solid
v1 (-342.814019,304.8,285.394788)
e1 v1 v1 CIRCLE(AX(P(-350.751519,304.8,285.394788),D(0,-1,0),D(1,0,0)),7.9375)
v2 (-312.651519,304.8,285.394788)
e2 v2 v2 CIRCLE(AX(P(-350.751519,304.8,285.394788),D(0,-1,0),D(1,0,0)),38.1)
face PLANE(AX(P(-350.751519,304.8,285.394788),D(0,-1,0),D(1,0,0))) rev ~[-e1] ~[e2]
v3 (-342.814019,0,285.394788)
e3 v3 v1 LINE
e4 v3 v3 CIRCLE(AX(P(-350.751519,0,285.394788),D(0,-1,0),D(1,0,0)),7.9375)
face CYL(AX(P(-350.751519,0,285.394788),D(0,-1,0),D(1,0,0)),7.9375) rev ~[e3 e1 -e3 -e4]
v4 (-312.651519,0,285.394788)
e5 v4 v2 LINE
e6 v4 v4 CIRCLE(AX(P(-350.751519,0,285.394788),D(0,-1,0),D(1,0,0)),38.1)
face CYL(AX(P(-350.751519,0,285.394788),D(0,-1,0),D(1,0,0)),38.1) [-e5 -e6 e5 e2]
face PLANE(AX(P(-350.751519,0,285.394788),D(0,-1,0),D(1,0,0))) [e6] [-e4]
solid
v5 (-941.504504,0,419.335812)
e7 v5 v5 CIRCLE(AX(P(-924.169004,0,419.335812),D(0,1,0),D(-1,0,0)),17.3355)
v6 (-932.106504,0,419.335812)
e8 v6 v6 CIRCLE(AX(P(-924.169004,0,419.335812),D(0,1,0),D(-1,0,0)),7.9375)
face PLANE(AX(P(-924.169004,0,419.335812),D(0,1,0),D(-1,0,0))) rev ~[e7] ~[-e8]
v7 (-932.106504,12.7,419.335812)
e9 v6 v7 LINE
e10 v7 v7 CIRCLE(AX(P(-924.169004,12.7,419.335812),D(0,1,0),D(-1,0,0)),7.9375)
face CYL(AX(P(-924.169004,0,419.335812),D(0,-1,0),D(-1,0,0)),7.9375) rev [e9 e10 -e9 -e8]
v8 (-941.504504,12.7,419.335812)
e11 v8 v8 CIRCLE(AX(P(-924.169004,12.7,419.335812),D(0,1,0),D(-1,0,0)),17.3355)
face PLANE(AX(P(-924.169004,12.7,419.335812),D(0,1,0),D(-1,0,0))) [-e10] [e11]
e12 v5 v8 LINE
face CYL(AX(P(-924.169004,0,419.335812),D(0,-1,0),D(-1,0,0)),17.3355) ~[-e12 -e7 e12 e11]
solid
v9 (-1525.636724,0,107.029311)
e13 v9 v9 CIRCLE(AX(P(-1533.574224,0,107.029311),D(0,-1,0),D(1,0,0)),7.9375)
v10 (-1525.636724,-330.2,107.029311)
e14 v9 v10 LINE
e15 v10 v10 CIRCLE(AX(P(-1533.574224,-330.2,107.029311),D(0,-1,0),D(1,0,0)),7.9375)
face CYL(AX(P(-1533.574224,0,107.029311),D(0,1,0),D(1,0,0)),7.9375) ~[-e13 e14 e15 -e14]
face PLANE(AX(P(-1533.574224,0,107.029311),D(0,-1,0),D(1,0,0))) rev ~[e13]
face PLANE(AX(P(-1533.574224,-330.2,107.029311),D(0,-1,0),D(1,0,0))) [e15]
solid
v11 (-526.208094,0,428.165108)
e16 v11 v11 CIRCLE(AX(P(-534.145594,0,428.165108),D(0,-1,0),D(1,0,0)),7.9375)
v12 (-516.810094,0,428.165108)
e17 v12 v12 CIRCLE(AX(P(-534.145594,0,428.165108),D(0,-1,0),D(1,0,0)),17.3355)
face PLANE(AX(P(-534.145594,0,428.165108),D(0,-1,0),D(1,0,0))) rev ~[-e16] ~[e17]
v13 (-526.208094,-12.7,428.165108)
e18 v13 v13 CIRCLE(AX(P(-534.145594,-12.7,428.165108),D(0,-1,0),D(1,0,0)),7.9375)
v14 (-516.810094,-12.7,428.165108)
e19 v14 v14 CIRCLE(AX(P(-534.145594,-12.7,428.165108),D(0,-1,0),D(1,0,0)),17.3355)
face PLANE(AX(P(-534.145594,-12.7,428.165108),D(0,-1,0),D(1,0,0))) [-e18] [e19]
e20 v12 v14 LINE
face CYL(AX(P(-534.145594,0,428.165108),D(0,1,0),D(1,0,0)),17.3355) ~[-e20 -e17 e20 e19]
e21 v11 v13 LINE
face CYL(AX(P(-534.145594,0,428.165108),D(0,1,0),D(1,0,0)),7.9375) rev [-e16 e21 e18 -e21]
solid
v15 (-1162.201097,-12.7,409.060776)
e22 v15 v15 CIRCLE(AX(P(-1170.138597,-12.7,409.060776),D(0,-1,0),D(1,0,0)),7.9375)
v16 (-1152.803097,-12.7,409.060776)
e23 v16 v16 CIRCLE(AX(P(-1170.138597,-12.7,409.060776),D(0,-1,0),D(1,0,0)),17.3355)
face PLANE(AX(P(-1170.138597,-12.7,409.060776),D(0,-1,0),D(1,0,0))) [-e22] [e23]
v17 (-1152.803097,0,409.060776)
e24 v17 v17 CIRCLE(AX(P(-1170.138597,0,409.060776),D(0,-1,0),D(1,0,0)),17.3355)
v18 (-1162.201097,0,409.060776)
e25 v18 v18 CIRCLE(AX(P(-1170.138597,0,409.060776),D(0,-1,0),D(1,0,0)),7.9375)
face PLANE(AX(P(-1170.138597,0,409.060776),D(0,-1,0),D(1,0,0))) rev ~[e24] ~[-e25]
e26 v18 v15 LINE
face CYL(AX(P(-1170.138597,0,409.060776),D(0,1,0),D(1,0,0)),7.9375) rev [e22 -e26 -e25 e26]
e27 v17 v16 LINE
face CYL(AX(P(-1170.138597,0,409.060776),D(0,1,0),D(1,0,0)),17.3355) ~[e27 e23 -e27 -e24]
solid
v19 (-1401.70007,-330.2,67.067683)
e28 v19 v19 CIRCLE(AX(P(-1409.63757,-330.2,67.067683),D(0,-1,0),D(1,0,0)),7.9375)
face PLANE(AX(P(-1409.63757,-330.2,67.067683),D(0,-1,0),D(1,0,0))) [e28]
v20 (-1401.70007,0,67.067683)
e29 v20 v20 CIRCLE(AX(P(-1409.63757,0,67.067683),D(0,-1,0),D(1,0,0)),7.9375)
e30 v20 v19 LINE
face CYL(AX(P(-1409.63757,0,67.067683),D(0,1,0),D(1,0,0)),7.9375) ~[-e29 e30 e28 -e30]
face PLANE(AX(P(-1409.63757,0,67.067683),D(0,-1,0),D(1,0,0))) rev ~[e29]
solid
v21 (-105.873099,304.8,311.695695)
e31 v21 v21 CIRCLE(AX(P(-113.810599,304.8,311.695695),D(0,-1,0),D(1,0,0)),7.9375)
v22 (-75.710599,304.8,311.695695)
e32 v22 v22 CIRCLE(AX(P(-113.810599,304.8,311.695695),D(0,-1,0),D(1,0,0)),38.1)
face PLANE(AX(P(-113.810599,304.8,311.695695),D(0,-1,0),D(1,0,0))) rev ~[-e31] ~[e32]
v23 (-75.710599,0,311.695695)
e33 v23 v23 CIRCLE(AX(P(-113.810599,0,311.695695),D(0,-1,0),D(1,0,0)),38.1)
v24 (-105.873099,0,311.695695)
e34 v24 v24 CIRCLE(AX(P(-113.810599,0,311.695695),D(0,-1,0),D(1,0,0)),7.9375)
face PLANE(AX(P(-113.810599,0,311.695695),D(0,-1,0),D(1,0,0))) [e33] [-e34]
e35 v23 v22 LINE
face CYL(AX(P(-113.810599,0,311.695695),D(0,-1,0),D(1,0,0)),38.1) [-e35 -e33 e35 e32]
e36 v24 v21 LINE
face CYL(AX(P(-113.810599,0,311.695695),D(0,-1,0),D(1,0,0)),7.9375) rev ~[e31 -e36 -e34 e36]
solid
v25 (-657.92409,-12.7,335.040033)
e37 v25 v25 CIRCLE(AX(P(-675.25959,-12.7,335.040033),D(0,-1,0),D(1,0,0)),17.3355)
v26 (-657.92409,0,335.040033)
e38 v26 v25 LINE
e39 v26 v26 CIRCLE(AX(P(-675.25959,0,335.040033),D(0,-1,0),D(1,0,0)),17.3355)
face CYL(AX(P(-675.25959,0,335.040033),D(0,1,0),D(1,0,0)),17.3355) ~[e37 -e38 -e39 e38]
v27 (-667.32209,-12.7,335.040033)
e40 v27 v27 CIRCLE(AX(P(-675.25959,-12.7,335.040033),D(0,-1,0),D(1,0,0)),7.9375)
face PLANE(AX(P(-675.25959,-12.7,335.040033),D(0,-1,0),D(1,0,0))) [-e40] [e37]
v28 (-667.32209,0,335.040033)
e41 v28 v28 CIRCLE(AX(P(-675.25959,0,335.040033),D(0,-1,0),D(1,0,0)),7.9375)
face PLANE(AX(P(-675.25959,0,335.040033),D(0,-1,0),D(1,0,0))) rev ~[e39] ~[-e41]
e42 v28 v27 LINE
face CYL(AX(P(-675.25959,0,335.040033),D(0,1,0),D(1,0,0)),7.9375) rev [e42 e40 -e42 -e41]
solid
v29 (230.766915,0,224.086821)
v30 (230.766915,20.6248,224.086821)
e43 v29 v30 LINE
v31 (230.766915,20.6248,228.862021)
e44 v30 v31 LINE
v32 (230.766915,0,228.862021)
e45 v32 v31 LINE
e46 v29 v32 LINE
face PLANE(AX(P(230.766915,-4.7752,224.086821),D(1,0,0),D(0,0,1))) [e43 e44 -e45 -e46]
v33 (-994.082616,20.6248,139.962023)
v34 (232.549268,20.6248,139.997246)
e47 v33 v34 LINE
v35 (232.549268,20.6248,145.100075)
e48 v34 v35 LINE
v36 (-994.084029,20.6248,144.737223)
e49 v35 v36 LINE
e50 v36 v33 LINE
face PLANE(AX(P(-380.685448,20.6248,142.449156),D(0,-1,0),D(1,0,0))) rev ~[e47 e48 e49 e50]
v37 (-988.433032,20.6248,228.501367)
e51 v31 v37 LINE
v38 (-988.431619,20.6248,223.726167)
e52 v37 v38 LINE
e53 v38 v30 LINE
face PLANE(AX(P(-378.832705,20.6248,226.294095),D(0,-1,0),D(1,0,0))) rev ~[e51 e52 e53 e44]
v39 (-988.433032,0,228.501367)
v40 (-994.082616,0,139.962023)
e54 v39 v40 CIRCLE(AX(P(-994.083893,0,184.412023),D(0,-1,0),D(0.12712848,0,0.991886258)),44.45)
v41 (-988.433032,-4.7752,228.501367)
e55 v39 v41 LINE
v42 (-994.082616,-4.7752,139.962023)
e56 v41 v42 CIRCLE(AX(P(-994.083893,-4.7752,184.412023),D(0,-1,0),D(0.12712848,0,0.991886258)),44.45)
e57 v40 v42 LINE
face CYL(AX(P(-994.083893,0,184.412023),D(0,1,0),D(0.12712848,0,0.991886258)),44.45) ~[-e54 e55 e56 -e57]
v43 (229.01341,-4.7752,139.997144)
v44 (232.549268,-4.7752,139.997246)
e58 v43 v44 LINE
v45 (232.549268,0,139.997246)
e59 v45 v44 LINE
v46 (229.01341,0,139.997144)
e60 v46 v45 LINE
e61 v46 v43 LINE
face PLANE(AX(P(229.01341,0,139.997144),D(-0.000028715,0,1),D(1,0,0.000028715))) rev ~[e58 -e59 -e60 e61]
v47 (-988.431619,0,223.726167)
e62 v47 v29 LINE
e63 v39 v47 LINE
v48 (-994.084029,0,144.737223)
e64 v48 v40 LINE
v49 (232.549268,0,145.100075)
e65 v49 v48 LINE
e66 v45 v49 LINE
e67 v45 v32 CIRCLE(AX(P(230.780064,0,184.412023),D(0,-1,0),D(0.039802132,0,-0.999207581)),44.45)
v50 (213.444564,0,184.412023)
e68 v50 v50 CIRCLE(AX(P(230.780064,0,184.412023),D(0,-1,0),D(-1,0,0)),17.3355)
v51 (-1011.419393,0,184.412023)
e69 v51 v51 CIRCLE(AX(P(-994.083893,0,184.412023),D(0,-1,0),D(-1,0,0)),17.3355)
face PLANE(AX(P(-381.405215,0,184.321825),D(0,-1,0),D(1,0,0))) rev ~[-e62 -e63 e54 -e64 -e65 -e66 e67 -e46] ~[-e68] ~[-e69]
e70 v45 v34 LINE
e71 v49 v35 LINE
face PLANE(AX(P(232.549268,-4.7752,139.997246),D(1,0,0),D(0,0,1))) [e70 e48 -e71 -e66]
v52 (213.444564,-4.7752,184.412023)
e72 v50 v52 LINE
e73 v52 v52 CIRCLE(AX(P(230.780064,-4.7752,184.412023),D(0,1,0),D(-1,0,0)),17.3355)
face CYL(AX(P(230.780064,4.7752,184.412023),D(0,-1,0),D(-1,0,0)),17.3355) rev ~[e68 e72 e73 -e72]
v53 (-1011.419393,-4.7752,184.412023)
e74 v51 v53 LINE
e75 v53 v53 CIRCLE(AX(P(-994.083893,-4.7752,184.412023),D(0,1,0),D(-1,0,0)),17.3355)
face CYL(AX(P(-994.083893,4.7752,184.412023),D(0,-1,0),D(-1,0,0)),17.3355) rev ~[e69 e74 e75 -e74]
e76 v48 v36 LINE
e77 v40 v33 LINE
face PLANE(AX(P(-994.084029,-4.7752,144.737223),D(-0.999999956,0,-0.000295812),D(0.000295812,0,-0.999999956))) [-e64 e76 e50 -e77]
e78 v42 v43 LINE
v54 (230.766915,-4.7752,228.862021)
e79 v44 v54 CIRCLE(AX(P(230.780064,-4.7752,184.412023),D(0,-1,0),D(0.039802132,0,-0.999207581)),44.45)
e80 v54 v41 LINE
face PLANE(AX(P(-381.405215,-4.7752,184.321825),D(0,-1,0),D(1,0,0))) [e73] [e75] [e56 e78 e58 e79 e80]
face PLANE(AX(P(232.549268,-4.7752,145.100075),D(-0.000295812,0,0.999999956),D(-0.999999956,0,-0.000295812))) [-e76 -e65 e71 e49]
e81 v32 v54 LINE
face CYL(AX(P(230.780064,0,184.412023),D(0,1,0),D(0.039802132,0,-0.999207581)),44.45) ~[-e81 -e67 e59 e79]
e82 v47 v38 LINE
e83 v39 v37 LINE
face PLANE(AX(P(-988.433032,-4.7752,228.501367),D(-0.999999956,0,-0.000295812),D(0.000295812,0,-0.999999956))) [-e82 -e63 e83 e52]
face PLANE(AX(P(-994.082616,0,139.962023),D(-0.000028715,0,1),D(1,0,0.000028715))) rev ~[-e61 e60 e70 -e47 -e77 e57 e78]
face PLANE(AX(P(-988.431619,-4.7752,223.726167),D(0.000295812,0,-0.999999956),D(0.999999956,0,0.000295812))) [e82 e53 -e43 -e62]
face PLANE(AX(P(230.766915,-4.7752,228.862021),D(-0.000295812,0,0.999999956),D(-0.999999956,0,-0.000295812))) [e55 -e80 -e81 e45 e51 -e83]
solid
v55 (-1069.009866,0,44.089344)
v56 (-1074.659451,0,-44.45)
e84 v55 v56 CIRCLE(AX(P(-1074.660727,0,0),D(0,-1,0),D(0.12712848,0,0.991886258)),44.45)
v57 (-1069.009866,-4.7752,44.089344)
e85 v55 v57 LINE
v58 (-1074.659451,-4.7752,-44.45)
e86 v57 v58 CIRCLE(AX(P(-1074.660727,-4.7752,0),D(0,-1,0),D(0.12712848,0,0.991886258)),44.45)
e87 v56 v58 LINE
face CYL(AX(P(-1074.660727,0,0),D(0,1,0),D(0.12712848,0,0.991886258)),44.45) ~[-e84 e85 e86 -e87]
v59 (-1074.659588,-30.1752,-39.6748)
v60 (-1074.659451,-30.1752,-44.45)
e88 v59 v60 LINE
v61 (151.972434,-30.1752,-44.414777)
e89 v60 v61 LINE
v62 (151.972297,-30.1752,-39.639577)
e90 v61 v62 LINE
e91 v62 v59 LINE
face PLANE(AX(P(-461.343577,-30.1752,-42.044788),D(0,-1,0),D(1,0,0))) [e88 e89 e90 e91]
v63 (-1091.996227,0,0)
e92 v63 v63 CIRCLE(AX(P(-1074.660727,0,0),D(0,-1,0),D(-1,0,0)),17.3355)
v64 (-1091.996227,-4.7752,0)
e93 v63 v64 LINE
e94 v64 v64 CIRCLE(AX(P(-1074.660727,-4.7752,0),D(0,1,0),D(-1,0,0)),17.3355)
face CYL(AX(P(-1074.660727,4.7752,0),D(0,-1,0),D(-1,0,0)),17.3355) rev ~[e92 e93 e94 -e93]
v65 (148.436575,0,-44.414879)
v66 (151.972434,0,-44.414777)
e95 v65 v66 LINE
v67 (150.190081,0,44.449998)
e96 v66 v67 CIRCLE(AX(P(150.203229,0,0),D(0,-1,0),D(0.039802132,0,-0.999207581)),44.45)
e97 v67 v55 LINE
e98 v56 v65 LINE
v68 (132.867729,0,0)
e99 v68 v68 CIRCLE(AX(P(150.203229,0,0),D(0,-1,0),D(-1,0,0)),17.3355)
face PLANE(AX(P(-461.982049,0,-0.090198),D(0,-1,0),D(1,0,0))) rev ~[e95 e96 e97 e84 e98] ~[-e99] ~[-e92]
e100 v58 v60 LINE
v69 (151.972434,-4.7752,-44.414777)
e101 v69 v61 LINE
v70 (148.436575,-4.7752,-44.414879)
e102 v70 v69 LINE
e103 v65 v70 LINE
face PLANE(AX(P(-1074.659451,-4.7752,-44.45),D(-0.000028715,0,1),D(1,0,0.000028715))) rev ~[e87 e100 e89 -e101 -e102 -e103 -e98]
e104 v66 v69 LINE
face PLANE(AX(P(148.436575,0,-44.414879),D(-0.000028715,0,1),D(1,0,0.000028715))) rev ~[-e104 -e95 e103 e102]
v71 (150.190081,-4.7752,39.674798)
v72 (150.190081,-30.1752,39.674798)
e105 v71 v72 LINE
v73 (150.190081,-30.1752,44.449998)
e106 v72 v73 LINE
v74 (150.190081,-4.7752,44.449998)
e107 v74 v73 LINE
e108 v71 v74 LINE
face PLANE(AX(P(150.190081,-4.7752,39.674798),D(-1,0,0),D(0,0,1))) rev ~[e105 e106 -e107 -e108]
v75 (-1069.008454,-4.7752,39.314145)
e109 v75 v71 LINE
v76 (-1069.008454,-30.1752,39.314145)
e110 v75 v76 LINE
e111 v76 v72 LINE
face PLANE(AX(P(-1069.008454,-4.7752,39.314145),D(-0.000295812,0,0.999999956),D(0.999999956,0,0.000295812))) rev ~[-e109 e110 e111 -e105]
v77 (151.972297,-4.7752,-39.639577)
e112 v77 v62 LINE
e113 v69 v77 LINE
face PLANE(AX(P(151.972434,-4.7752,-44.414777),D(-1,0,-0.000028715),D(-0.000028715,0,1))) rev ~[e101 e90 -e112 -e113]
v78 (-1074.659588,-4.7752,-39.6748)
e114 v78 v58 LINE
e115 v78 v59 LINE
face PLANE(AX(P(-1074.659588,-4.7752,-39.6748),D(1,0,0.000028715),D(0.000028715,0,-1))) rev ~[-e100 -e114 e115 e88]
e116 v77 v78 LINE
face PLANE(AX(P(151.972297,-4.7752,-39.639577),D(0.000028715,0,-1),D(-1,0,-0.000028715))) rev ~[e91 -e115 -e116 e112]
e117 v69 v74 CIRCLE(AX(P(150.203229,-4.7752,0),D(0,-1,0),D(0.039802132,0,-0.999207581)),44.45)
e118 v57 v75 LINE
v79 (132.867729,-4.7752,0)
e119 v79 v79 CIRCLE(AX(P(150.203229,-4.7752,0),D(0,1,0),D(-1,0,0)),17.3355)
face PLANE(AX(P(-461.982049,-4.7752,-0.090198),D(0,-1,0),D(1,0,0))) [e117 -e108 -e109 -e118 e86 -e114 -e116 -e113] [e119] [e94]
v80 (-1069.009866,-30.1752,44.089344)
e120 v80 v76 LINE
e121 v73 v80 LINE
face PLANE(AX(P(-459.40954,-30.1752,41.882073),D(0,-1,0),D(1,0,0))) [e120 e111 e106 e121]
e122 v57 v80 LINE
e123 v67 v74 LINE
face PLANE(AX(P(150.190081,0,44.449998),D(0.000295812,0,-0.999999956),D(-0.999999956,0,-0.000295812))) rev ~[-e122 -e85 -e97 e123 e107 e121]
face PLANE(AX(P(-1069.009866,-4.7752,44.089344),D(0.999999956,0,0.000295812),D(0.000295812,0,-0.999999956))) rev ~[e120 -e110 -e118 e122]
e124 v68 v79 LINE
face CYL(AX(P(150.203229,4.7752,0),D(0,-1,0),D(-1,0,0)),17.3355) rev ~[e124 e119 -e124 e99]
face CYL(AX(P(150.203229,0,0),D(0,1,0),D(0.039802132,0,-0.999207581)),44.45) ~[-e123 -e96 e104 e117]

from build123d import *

# Parameters (mm, degrees)
F1_DEPTH  = 4.7752
F2_D      = 34.671
F2_DEPTH  = 4.7752
F2_TIP    = 10.4162192612
F4_DEPTH  = 25.4
F6_DEPTH  = 4.7752
F7_D      = 34.671
F7_DEPTH  = 4.7752
F7_TIP    = 10.4162192612
F9_DEPTH  = 25.4
F10_R     = 17.3355
F10_R_2   = 7.9375
F11_DEPTH = 12.7
F12_R     = 17.3355
F12_R_2   = 7.9375
F13_DEPTH = 12.7
F14_R     = 17.3355
F14_R_2   = 7.9375
F15_DEPTH = 12.7
F16_R     = 17.3355
F16_R_2   = 7.9375
F17_DEPTH = 12.7
F18_R     = 38.1
F18_R_2   = 7.9375
F19_DEPTH = 304.8
F20_R     = 38.1
F20_R_2   = 7.9375
F21_DEPTH = 304.8
F22_R     = 7.9375
F23_DEPTH = 330.2
F24_R     = 7.9375
F25_DEPTH = 330.2


# Not quite as in the source:
# - a feature names something its author has since deleted; it is built from what else it names


with BuildPart() as f1:
    # F0 (on Front) → F1 (new body)
    with BuildSketch(Plane.XZ):
        with BuildLine():
            Line((-1074.6594506346, -44.4499999817), (148.4365754055, -44.414878516))
            Line((148.4365754055, -44.414878516), (151.9724341991, -44.414776983))
            ThreePointArc((151.9724341991, -44.414776983), (194.6442914443, 0.8913507924), (150.1900805819, 44.4499980552))
            Line((150.1900805819, 44.4499980552), (-1069.0098660753, 44.0893441833))
            ThreePointArc((-1069.0098660753, 44.0893441833), (-1119.0205120843, 2.8305422757), (-1074.6594506346, -44.4499999817))
        make_face()
    extrude(amount=F1_DEPTH)

    # F2
    with Locations(Plane(origin=(0, 0, 0), x_dir=(1, 0, 0), z_dir=(0, 1, 0))):
        with Locations((-1074.6607270259, 0), (150.2032294209, 0)):
            Hole(F2_D / 2, depth=F2_DEPTH)
            with Locations((0, 0, -(F2_DEPTH + F2_TIP / 2))):  # 118° drill point
                Cone(0, F2_D / 2, F2_TIP, mode=Mode.SUBTRACT)

    # F3 (on face) → F4 (join)
    with BuildSketch(Plane.XZ.offset(4.7752)):
        Polygon((-1074.6595877555, -39.6747999836), (-1074.6594506346, -44.4499999817), (151.9724341991, -44.414776983), (151.9722970782, -39.639576985), align=None)
        Polygon((150.1900805819, 44.4499980552), (-1069.0098660753, 44.0893441833), (-1069.0084535143, 39.3141446012), (150.1900805819, 39.6747980552), align=None)
    extrude(amount=F4_DEPTH)


with BuildPart() as f6:
    # F5 (on Front) → F6 (new body)
    with BuildSketch(Plane.XZ):
        with BuildLine():
            Line((-994.0826163973, 139.9620227242), (229.0134096428, 139.9971441899))
            Line((229.0134096428, 139.9971441899), (232.5492684364, 139.9972457228))
            ThreePointArc((232.5492684364, 139.9972457228), (275.2211256816, 185.3033734983), (230.7669148192, 228.8620207611))
            Line((230.7669148192, 228.8620207611), (-988.433031838, 228.5013668892))
            ThreePointArc((-988.433031838, 228.5013668892), (-1038.443677847, 187.2425649815), (-994.0826163973, 139.9620227242))
        make_face()
    extrude(amount=F6_DEPTH)

    # F7
    with Locations(Plane(origin=(0, 0, 0), x_dir=(1, 0, 0), z_dir=(0, 1, 0))):
        with Locations((-994.0838927886, -184.4120227059), (230.7800636583, -184.4120227059)):
            Hole(F7_D / 2, depth=F7_DEPTH)
            with Locations((0, 0, -(F7_DEPTH + F7_TIP / 2))):  # 118° drill point
                Cone(0, F7_D / 2, F7_TIP, mode=Mode.SUBTRACT)

    # F8 (on face) → F9 (join)
    with BuildSketch(Plane.XZ.offset(4.7752)):
        Polygon((230.7669148192, 228.8620207611), (-988.433031838, 228.5013668892), (-988.431619277, 223.7261670981), (230.7669148192, 224.0868205521), align=None)
        Polygon((-994.0840289583, 144.7372225153), (-994.0826163973, 139.9620227242), (232.5492684364, 139.9972457228), (232.5492684364, 145.1000752608), align=None)
    extrude(amount=-F9_DEPTH)


with BuildPart() as f11:
    # F10 (on Front) → F11 (new body)
    with BuildSketch(Plane.XZ):
        with Locations((-675.2595901489, 335.0400328636)):
            Circle(F10_R)
        with Locations((-675.2595901489, 335.0400328636)):
            Circle(F10_R_2, mode=Mode.SUBTRACT)
    extrude(amount=F11_DEPTH)


with BuildPart() as f13:
    # F12 (on face) → F13 (new body)
    with BuildSketch(Plane(origin=(0, 0, 0), x_dir=(-1, 0, 0), z_dir=(0, 1, 0))):
        with Locations((924.1690039635, 419.3358123302)):
            Circle(F12_R)
        with Locations((924.1690039635, 419.3358123302)):
            Circle(F12_R_2, mode=Mode.SUBTRACT)
    extrude(amount=F13_DEPTH)


with BuildPart() as f15:
    # F14 (on Front) → F15 (new body)
    with BuildSketch(Plane.XZ):
        with Locations((-534.1455936432, 428.1651079655)):
            Circle(F14_R)
        with Locations((-534.1455936432, 428.1651079655)):
            Circle(F14_R_2, mode=Mode.SUBTRACT)
    extrude(amount=F15_DEPTH)


with BuildPart() as f17:
    # F16 (on Front) → F17 (new body)
    with BuildSketch(Plane.XZ):
        with Locations((-1170.1385974884, 409.0607762337)):
            Circle(F16_R)
        with Locations((-1170.1385974884, 409.0607762337)):
            Circle(F16_R_2, mode=Mode.SUBTRACT)
    extrude(amount=F17_DEPTH)


with BuildPart() as f19:
    # F18 (on Front) → F19 (new body)
    with BuildSketch(Plane.XZ):
        with Locations((-350.7515192032, 285.3947877884)):
            Circle(F18_R)
        with Locations((-350.7515192032, 285.3947877884)):
            Circle(F18_R_2, mode=Mode.SUBTRACT)
    extrude(amount=-F19_DEPTH)


with BuildPart() as f21:
    # F20 (on Front) → F21 (new body)
    with BuildSketch(Plane.XZ):
        with Locations((-113.8105988503, 311.6956949234)):
            Circle(F20_R)
        with Locations((-113.8105988503, 311.6956949234)):
            Circle(F20_R_2, mode=Mode.SUBTRACT)
    extrude(amount=-F21_DEPTH)


with BuildPart() as f23:
    # F22 (on Front) → F23 (new body)
    with BuildSketch(Plane.XZ):
        with Locations((-1409.6375703812, 67.0676827431)):
            Circle(F22_R)
    extrude(amount=F23_DEPTH)


with BuildPart() as f25:
    # F24 (on Front) → F25 (new body)
    with BuildSketch(Plane.XZ):
        with Locations((-1533.5742235184, 107.0293113589)):
            Circle(F24_R)
    extrude(amount=F25_DEPTH)


solid = Compound([f1.part, f6.part, f11.part, f13.part, f15.part, f17.part, f19.part, f21.part, f23.part, f25.part])
